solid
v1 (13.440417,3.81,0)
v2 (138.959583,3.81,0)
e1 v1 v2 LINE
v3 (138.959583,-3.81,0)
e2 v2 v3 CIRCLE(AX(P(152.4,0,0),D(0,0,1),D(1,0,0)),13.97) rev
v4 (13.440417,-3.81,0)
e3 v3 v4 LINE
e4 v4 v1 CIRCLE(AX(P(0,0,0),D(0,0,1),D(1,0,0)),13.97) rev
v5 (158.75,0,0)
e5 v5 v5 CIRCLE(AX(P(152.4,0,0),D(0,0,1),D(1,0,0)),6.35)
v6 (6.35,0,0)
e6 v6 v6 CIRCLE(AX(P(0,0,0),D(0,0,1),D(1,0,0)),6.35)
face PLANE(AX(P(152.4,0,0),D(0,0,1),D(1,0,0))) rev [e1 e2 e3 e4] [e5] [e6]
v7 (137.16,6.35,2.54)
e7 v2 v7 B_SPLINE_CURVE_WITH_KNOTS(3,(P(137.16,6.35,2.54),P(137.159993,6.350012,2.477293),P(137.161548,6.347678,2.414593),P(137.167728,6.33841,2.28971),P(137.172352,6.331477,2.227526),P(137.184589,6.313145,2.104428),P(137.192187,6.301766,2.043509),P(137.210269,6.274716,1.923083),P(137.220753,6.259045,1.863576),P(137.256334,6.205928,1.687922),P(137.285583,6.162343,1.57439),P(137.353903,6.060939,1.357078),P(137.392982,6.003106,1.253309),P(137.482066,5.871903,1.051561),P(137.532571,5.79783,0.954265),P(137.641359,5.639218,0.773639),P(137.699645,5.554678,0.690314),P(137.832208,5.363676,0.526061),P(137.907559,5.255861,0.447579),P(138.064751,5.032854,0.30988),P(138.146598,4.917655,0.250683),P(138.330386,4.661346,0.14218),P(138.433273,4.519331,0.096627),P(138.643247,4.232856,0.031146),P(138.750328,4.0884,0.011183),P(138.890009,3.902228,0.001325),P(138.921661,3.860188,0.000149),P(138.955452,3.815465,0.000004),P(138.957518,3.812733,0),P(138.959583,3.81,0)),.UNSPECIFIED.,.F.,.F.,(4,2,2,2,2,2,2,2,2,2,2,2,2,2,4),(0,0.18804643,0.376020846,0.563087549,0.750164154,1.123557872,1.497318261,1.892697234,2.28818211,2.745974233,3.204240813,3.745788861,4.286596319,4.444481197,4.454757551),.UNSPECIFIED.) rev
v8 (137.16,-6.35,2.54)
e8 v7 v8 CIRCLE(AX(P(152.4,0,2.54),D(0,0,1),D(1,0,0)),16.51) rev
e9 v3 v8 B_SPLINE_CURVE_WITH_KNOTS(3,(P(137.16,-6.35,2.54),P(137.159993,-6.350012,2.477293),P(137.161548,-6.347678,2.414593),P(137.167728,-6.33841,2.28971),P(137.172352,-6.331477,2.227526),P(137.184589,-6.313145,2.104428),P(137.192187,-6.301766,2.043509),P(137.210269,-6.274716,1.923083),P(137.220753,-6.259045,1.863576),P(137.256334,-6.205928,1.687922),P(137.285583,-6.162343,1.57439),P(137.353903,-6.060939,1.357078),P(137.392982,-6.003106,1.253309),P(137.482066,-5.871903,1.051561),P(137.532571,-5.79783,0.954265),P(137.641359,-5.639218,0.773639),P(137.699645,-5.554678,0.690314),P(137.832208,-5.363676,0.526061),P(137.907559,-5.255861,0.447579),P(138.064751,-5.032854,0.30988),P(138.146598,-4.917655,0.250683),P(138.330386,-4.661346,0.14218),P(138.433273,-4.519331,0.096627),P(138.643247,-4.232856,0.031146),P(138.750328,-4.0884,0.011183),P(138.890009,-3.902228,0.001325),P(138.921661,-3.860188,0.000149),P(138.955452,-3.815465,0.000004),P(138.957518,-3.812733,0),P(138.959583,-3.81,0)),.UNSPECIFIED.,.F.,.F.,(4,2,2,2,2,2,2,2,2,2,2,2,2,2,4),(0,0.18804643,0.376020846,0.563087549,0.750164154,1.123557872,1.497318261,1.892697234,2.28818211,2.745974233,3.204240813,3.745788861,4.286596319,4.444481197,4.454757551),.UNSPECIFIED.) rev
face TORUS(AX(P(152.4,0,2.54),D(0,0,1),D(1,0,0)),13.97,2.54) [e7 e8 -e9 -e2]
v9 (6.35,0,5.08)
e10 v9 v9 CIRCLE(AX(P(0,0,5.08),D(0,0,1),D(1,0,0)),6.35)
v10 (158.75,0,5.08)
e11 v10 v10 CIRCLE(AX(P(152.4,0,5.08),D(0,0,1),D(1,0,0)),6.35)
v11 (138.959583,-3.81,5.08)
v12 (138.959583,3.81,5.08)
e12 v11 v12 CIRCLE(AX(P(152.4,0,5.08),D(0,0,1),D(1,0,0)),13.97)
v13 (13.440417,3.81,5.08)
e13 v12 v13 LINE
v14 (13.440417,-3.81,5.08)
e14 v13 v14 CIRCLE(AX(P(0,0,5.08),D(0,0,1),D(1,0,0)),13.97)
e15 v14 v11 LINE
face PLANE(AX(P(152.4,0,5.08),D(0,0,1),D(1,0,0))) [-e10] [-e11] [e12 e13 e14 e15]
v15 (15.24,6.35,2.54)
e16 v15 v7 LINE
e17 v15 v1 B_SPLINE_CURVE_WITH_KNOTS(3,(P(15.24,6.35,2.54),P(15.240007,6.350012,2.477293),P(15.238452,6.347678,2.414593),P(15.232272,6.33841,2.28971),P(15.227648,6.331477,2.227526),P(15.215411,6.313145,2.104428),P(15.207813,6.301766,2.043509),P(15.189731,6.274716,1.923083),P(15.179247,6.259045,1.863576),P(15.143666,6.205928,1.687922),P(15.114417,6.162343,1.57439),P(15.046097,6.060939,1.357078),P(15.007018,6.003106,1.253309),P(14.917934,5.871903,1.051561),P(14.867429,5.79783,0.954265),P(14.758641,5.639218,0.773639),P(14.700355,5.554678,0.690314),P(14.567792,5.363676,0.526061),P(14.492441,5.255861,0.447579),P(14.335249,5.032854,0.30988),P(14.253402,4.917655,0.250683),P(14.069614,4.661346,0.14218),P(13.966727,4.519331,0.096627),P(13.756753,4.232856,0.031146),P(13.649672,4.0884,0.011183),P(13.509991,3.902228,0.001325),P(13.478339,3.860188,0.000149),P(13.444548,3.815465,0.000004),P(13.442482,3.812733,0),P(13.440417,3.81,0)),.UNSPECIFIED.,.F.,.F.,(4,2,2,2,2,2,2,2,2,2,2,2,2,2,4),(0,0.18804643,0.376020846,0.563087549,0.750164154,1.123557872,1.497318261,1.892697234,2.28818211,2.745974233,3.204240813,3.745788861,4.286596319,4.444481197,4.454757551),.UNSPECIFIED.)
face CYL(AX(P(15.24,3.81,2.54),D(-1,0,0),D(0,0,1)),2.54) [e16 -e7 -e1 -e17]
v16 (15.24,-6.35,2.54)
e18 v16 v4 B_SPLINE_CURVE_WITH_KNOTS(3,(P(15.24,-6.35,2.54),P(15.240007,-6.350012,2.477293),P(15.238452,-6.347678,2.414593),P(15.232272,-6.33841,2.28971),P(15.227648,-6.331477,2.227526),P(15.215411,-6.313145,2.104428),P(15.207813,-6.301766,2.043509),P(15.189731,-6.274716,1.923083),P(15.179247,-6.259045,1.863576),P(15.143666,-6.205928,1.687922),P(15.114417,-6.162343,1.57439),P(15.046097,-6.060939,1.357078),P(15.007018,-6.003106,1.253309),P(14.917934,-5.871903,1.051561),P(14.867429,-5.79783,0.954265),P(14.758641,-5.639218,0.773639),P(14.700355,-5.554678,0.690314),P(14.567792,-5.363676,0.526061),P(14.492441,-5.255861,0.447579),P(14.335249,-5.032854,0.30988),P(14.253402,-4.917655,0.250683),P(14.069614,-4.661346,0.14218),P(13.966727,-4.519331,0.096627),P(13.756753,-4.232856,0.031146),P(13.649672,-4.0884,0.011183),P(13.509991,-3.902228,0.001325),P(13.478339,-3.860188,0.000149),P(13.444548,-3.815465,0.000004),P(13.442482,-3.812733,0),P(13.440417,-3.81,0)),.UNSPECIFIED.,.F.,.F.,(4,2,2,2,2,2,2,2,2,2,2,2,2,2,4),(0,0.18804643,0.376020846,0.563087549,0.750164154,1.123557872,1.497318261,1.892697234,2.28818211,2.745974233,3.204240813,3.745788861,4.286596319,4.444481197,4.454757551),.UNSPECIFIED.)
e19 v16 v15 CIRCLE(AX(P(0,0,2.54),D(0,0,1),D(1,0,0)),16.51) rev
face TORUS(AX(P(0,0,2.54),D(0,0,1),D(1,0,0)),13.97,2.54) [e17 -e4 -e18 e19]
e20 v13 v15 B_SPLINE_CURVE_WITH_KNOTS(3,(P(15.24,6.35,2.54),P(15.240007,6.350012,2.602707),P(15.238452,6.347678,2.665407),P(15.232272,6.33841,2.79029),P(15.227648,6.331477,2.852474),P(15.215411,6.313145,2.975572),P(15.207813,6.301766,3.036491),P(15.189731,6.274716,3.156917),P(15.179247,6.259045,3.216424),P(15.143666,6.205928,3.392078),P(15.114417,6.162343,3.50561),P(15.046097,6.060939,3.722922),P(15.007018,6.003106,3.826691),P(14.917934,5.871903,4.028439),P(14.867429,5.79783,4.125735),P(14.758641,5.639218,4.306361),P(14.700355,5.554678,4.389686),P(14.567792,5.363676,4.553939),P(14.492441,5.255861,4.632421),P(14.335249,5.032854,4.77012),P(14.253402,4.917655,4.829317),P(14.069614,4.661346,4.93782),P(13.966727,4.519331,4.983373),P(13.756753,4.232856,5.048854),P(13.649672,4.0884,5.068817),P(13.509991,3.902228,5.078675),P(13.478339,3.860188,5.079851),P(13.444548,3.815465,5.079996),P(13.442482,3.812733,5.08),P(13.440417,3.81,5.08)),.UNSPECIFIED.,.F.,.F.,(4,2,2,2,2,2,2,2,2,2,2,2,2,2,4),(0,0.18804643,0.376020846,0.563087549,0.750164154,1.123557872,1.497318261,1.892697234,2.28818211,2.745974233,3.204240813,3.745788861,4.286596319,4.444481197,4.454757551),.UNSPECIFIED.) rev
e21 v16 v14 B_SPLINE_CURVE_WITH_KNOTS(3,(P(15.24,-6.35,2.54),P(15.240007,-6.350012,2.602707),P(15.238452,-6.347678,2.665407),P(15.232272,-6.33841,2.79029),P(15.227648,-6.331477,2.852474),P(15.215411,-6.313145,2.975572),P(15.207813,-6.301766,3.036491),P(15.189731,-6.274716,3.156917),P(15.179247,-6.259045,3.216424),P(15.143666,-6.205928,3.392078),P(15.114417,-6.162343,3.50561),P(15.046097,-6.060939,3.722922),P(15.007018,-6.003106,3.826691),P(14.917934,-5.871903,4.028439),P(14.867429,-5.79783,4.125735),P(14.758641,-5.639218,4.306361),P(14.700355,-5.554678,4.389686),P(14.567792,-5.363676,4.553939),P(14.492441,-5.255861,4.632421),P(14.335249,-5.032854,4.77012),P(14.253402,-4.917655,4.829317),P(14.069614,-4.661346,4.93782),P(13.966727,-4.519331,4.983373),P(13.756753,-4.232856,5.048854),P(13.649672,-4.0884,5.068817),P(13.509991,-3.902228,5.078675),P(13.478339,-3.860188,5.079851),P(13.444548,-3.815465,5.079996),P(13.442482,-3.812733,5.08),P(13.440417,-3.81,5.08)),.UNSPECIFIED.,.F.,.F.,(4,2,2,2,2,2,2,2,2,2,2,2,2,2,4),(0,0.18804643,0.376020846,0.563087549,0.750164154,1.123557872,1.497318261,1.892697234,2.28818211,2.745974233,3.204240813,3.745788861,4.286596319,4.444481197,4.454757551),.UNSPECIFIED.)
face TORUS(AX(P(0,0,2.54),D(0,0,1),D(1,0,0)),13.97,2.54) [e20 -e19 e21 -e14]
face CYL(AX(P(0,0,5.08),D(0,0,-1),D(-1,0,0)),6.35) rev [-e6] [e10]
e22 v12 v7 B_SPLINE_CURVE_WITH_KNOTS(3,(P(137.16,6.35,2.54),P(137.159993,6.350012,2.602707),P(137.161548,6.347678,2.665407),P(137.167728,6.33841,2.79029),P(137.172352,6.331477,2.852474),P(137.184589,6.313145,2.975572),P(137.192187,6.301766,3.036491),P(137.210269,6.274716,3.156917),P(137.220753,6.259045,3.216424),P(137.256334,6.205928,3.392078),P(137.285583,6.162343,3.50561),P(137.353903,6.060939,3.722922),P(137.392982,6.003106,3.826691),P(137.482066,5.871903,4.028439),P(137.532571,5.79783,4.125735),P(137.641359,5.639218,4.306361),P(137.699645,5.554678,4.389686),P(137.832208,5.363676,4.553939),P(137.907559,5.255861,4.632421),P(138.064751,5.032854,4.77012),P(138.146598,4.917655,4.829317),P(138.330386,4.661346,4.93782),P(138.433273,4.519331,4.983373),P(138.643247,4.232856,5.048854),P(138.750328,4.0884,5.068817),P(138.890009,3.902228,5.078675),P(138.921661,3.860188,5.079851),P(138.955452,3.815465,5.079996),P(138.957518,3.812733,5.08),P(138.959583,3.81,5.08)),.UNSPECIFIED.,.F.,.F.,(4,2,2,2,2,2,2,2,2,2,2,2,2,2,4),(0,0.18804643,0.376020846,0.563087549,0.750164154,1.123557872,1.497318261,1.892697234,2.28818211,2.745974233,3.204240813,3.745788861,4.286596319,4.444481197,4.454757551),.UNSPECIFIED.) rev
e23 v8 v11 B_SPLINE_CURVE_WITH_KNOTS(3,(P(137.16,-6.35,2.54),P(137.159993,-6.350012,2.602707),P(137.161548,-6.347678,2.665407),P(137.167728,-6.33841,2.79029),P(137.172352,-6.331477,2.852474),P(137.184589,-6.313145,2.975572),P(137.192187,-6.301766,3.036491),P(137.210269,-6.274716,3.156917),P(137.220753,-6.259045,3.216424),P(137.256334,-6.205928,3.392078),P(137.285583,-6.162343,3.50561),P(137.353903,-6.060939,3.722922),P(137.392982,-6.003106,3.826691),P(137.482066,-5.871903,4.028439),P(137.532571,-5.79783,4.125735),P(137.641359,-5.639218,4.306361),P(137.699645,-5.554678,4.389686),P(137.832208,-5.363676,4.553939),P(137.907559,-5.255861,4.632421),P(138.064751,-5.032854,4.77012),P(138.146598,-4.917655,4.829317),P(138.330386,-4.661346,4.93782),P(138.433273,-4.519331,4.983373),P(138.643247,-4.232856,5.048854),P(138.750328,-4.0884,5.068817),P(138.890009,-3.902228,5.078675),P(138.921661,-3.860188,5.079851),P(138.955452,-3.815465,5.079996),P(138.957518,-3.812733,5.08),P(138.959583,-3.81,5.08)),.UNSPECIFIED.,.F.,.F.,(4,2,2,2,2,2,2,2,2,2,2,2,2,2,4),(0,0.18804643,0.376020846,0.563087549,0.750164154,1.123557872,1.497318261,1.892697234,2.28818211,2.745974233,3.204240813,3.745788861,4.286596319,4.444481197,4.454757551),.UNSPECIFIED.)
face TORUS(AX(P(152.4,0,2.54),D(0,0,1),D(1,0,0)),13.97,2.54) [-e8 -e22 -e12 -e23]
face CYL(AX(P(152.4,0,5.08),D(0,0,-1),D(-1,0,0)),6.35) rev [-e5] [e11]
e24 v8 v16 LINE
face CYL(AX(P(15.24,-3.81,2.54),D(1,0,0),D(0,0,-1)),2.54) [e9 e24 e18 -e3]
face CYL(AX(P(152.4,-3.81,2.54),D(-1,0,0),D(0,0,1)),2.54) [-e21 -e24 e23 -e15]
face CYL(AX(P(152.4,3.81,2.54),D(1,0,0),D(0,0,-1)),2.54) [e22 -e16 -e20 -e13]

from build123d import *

# Parameters (mm, degrees)
SKETCH1_R           = 6.35
BOSS_EXTRUDE1_DEPTH = 5.08
FILLET1_R           = 2.54
FILLET2_R           = 2.54


with BuildPart() as part:
    # Sketch1 → Boss-Extrude1 (new body)
    with BuildSketch(Plane.XY):
        with BuildLine():
            Line((15.24, -6.35), (137.16, -6.35))
            ThreePointArc((137.16, -6.35), (168.91, 0), (137.16, 6.35))
            Line((137.16, 6.35), (15.24, 6.35))
            ThreePointArc((15.24, 6.35), (-16.51, 0), (15.24, -6.35))
        make_face()
        Circle(SKETCH1_R, mode=Mode.SUBTRACT)
        with Locations((152.4, 0)):
            Circle(SKETCH1_R, mode=Mode.SUBTRACT)
    extrude(amount=BOSS_EXTRUDE1_DEPTH)

    # Fillet1
    fillet1_edges = [part.edges().sort_by_distance(p)[0] for p in [
        (-16.51, 0, 5.08),
        (76.2, -6.35, 5.08),
        (168.91, 0, 5.08),
        (76.2, 6.35, 5.08),
    ]]
    fillet(fillet1_edges, radius=FILLET1_R)

    # Fillet2
    fillet2_edges = [part.edges().sort_by_distance(p)[0] for p in [
        (76.2, -6.35, 0),
        (-16.51, 0, 0),
        (76.2, 6.35, 0),
        (168.91, 0, 0),
    ]]
    fillet(fillet2_edges, radius=FILLET2_R - 0.0001)  # a hair under: the kernel refuses the full size


solid = part.part
